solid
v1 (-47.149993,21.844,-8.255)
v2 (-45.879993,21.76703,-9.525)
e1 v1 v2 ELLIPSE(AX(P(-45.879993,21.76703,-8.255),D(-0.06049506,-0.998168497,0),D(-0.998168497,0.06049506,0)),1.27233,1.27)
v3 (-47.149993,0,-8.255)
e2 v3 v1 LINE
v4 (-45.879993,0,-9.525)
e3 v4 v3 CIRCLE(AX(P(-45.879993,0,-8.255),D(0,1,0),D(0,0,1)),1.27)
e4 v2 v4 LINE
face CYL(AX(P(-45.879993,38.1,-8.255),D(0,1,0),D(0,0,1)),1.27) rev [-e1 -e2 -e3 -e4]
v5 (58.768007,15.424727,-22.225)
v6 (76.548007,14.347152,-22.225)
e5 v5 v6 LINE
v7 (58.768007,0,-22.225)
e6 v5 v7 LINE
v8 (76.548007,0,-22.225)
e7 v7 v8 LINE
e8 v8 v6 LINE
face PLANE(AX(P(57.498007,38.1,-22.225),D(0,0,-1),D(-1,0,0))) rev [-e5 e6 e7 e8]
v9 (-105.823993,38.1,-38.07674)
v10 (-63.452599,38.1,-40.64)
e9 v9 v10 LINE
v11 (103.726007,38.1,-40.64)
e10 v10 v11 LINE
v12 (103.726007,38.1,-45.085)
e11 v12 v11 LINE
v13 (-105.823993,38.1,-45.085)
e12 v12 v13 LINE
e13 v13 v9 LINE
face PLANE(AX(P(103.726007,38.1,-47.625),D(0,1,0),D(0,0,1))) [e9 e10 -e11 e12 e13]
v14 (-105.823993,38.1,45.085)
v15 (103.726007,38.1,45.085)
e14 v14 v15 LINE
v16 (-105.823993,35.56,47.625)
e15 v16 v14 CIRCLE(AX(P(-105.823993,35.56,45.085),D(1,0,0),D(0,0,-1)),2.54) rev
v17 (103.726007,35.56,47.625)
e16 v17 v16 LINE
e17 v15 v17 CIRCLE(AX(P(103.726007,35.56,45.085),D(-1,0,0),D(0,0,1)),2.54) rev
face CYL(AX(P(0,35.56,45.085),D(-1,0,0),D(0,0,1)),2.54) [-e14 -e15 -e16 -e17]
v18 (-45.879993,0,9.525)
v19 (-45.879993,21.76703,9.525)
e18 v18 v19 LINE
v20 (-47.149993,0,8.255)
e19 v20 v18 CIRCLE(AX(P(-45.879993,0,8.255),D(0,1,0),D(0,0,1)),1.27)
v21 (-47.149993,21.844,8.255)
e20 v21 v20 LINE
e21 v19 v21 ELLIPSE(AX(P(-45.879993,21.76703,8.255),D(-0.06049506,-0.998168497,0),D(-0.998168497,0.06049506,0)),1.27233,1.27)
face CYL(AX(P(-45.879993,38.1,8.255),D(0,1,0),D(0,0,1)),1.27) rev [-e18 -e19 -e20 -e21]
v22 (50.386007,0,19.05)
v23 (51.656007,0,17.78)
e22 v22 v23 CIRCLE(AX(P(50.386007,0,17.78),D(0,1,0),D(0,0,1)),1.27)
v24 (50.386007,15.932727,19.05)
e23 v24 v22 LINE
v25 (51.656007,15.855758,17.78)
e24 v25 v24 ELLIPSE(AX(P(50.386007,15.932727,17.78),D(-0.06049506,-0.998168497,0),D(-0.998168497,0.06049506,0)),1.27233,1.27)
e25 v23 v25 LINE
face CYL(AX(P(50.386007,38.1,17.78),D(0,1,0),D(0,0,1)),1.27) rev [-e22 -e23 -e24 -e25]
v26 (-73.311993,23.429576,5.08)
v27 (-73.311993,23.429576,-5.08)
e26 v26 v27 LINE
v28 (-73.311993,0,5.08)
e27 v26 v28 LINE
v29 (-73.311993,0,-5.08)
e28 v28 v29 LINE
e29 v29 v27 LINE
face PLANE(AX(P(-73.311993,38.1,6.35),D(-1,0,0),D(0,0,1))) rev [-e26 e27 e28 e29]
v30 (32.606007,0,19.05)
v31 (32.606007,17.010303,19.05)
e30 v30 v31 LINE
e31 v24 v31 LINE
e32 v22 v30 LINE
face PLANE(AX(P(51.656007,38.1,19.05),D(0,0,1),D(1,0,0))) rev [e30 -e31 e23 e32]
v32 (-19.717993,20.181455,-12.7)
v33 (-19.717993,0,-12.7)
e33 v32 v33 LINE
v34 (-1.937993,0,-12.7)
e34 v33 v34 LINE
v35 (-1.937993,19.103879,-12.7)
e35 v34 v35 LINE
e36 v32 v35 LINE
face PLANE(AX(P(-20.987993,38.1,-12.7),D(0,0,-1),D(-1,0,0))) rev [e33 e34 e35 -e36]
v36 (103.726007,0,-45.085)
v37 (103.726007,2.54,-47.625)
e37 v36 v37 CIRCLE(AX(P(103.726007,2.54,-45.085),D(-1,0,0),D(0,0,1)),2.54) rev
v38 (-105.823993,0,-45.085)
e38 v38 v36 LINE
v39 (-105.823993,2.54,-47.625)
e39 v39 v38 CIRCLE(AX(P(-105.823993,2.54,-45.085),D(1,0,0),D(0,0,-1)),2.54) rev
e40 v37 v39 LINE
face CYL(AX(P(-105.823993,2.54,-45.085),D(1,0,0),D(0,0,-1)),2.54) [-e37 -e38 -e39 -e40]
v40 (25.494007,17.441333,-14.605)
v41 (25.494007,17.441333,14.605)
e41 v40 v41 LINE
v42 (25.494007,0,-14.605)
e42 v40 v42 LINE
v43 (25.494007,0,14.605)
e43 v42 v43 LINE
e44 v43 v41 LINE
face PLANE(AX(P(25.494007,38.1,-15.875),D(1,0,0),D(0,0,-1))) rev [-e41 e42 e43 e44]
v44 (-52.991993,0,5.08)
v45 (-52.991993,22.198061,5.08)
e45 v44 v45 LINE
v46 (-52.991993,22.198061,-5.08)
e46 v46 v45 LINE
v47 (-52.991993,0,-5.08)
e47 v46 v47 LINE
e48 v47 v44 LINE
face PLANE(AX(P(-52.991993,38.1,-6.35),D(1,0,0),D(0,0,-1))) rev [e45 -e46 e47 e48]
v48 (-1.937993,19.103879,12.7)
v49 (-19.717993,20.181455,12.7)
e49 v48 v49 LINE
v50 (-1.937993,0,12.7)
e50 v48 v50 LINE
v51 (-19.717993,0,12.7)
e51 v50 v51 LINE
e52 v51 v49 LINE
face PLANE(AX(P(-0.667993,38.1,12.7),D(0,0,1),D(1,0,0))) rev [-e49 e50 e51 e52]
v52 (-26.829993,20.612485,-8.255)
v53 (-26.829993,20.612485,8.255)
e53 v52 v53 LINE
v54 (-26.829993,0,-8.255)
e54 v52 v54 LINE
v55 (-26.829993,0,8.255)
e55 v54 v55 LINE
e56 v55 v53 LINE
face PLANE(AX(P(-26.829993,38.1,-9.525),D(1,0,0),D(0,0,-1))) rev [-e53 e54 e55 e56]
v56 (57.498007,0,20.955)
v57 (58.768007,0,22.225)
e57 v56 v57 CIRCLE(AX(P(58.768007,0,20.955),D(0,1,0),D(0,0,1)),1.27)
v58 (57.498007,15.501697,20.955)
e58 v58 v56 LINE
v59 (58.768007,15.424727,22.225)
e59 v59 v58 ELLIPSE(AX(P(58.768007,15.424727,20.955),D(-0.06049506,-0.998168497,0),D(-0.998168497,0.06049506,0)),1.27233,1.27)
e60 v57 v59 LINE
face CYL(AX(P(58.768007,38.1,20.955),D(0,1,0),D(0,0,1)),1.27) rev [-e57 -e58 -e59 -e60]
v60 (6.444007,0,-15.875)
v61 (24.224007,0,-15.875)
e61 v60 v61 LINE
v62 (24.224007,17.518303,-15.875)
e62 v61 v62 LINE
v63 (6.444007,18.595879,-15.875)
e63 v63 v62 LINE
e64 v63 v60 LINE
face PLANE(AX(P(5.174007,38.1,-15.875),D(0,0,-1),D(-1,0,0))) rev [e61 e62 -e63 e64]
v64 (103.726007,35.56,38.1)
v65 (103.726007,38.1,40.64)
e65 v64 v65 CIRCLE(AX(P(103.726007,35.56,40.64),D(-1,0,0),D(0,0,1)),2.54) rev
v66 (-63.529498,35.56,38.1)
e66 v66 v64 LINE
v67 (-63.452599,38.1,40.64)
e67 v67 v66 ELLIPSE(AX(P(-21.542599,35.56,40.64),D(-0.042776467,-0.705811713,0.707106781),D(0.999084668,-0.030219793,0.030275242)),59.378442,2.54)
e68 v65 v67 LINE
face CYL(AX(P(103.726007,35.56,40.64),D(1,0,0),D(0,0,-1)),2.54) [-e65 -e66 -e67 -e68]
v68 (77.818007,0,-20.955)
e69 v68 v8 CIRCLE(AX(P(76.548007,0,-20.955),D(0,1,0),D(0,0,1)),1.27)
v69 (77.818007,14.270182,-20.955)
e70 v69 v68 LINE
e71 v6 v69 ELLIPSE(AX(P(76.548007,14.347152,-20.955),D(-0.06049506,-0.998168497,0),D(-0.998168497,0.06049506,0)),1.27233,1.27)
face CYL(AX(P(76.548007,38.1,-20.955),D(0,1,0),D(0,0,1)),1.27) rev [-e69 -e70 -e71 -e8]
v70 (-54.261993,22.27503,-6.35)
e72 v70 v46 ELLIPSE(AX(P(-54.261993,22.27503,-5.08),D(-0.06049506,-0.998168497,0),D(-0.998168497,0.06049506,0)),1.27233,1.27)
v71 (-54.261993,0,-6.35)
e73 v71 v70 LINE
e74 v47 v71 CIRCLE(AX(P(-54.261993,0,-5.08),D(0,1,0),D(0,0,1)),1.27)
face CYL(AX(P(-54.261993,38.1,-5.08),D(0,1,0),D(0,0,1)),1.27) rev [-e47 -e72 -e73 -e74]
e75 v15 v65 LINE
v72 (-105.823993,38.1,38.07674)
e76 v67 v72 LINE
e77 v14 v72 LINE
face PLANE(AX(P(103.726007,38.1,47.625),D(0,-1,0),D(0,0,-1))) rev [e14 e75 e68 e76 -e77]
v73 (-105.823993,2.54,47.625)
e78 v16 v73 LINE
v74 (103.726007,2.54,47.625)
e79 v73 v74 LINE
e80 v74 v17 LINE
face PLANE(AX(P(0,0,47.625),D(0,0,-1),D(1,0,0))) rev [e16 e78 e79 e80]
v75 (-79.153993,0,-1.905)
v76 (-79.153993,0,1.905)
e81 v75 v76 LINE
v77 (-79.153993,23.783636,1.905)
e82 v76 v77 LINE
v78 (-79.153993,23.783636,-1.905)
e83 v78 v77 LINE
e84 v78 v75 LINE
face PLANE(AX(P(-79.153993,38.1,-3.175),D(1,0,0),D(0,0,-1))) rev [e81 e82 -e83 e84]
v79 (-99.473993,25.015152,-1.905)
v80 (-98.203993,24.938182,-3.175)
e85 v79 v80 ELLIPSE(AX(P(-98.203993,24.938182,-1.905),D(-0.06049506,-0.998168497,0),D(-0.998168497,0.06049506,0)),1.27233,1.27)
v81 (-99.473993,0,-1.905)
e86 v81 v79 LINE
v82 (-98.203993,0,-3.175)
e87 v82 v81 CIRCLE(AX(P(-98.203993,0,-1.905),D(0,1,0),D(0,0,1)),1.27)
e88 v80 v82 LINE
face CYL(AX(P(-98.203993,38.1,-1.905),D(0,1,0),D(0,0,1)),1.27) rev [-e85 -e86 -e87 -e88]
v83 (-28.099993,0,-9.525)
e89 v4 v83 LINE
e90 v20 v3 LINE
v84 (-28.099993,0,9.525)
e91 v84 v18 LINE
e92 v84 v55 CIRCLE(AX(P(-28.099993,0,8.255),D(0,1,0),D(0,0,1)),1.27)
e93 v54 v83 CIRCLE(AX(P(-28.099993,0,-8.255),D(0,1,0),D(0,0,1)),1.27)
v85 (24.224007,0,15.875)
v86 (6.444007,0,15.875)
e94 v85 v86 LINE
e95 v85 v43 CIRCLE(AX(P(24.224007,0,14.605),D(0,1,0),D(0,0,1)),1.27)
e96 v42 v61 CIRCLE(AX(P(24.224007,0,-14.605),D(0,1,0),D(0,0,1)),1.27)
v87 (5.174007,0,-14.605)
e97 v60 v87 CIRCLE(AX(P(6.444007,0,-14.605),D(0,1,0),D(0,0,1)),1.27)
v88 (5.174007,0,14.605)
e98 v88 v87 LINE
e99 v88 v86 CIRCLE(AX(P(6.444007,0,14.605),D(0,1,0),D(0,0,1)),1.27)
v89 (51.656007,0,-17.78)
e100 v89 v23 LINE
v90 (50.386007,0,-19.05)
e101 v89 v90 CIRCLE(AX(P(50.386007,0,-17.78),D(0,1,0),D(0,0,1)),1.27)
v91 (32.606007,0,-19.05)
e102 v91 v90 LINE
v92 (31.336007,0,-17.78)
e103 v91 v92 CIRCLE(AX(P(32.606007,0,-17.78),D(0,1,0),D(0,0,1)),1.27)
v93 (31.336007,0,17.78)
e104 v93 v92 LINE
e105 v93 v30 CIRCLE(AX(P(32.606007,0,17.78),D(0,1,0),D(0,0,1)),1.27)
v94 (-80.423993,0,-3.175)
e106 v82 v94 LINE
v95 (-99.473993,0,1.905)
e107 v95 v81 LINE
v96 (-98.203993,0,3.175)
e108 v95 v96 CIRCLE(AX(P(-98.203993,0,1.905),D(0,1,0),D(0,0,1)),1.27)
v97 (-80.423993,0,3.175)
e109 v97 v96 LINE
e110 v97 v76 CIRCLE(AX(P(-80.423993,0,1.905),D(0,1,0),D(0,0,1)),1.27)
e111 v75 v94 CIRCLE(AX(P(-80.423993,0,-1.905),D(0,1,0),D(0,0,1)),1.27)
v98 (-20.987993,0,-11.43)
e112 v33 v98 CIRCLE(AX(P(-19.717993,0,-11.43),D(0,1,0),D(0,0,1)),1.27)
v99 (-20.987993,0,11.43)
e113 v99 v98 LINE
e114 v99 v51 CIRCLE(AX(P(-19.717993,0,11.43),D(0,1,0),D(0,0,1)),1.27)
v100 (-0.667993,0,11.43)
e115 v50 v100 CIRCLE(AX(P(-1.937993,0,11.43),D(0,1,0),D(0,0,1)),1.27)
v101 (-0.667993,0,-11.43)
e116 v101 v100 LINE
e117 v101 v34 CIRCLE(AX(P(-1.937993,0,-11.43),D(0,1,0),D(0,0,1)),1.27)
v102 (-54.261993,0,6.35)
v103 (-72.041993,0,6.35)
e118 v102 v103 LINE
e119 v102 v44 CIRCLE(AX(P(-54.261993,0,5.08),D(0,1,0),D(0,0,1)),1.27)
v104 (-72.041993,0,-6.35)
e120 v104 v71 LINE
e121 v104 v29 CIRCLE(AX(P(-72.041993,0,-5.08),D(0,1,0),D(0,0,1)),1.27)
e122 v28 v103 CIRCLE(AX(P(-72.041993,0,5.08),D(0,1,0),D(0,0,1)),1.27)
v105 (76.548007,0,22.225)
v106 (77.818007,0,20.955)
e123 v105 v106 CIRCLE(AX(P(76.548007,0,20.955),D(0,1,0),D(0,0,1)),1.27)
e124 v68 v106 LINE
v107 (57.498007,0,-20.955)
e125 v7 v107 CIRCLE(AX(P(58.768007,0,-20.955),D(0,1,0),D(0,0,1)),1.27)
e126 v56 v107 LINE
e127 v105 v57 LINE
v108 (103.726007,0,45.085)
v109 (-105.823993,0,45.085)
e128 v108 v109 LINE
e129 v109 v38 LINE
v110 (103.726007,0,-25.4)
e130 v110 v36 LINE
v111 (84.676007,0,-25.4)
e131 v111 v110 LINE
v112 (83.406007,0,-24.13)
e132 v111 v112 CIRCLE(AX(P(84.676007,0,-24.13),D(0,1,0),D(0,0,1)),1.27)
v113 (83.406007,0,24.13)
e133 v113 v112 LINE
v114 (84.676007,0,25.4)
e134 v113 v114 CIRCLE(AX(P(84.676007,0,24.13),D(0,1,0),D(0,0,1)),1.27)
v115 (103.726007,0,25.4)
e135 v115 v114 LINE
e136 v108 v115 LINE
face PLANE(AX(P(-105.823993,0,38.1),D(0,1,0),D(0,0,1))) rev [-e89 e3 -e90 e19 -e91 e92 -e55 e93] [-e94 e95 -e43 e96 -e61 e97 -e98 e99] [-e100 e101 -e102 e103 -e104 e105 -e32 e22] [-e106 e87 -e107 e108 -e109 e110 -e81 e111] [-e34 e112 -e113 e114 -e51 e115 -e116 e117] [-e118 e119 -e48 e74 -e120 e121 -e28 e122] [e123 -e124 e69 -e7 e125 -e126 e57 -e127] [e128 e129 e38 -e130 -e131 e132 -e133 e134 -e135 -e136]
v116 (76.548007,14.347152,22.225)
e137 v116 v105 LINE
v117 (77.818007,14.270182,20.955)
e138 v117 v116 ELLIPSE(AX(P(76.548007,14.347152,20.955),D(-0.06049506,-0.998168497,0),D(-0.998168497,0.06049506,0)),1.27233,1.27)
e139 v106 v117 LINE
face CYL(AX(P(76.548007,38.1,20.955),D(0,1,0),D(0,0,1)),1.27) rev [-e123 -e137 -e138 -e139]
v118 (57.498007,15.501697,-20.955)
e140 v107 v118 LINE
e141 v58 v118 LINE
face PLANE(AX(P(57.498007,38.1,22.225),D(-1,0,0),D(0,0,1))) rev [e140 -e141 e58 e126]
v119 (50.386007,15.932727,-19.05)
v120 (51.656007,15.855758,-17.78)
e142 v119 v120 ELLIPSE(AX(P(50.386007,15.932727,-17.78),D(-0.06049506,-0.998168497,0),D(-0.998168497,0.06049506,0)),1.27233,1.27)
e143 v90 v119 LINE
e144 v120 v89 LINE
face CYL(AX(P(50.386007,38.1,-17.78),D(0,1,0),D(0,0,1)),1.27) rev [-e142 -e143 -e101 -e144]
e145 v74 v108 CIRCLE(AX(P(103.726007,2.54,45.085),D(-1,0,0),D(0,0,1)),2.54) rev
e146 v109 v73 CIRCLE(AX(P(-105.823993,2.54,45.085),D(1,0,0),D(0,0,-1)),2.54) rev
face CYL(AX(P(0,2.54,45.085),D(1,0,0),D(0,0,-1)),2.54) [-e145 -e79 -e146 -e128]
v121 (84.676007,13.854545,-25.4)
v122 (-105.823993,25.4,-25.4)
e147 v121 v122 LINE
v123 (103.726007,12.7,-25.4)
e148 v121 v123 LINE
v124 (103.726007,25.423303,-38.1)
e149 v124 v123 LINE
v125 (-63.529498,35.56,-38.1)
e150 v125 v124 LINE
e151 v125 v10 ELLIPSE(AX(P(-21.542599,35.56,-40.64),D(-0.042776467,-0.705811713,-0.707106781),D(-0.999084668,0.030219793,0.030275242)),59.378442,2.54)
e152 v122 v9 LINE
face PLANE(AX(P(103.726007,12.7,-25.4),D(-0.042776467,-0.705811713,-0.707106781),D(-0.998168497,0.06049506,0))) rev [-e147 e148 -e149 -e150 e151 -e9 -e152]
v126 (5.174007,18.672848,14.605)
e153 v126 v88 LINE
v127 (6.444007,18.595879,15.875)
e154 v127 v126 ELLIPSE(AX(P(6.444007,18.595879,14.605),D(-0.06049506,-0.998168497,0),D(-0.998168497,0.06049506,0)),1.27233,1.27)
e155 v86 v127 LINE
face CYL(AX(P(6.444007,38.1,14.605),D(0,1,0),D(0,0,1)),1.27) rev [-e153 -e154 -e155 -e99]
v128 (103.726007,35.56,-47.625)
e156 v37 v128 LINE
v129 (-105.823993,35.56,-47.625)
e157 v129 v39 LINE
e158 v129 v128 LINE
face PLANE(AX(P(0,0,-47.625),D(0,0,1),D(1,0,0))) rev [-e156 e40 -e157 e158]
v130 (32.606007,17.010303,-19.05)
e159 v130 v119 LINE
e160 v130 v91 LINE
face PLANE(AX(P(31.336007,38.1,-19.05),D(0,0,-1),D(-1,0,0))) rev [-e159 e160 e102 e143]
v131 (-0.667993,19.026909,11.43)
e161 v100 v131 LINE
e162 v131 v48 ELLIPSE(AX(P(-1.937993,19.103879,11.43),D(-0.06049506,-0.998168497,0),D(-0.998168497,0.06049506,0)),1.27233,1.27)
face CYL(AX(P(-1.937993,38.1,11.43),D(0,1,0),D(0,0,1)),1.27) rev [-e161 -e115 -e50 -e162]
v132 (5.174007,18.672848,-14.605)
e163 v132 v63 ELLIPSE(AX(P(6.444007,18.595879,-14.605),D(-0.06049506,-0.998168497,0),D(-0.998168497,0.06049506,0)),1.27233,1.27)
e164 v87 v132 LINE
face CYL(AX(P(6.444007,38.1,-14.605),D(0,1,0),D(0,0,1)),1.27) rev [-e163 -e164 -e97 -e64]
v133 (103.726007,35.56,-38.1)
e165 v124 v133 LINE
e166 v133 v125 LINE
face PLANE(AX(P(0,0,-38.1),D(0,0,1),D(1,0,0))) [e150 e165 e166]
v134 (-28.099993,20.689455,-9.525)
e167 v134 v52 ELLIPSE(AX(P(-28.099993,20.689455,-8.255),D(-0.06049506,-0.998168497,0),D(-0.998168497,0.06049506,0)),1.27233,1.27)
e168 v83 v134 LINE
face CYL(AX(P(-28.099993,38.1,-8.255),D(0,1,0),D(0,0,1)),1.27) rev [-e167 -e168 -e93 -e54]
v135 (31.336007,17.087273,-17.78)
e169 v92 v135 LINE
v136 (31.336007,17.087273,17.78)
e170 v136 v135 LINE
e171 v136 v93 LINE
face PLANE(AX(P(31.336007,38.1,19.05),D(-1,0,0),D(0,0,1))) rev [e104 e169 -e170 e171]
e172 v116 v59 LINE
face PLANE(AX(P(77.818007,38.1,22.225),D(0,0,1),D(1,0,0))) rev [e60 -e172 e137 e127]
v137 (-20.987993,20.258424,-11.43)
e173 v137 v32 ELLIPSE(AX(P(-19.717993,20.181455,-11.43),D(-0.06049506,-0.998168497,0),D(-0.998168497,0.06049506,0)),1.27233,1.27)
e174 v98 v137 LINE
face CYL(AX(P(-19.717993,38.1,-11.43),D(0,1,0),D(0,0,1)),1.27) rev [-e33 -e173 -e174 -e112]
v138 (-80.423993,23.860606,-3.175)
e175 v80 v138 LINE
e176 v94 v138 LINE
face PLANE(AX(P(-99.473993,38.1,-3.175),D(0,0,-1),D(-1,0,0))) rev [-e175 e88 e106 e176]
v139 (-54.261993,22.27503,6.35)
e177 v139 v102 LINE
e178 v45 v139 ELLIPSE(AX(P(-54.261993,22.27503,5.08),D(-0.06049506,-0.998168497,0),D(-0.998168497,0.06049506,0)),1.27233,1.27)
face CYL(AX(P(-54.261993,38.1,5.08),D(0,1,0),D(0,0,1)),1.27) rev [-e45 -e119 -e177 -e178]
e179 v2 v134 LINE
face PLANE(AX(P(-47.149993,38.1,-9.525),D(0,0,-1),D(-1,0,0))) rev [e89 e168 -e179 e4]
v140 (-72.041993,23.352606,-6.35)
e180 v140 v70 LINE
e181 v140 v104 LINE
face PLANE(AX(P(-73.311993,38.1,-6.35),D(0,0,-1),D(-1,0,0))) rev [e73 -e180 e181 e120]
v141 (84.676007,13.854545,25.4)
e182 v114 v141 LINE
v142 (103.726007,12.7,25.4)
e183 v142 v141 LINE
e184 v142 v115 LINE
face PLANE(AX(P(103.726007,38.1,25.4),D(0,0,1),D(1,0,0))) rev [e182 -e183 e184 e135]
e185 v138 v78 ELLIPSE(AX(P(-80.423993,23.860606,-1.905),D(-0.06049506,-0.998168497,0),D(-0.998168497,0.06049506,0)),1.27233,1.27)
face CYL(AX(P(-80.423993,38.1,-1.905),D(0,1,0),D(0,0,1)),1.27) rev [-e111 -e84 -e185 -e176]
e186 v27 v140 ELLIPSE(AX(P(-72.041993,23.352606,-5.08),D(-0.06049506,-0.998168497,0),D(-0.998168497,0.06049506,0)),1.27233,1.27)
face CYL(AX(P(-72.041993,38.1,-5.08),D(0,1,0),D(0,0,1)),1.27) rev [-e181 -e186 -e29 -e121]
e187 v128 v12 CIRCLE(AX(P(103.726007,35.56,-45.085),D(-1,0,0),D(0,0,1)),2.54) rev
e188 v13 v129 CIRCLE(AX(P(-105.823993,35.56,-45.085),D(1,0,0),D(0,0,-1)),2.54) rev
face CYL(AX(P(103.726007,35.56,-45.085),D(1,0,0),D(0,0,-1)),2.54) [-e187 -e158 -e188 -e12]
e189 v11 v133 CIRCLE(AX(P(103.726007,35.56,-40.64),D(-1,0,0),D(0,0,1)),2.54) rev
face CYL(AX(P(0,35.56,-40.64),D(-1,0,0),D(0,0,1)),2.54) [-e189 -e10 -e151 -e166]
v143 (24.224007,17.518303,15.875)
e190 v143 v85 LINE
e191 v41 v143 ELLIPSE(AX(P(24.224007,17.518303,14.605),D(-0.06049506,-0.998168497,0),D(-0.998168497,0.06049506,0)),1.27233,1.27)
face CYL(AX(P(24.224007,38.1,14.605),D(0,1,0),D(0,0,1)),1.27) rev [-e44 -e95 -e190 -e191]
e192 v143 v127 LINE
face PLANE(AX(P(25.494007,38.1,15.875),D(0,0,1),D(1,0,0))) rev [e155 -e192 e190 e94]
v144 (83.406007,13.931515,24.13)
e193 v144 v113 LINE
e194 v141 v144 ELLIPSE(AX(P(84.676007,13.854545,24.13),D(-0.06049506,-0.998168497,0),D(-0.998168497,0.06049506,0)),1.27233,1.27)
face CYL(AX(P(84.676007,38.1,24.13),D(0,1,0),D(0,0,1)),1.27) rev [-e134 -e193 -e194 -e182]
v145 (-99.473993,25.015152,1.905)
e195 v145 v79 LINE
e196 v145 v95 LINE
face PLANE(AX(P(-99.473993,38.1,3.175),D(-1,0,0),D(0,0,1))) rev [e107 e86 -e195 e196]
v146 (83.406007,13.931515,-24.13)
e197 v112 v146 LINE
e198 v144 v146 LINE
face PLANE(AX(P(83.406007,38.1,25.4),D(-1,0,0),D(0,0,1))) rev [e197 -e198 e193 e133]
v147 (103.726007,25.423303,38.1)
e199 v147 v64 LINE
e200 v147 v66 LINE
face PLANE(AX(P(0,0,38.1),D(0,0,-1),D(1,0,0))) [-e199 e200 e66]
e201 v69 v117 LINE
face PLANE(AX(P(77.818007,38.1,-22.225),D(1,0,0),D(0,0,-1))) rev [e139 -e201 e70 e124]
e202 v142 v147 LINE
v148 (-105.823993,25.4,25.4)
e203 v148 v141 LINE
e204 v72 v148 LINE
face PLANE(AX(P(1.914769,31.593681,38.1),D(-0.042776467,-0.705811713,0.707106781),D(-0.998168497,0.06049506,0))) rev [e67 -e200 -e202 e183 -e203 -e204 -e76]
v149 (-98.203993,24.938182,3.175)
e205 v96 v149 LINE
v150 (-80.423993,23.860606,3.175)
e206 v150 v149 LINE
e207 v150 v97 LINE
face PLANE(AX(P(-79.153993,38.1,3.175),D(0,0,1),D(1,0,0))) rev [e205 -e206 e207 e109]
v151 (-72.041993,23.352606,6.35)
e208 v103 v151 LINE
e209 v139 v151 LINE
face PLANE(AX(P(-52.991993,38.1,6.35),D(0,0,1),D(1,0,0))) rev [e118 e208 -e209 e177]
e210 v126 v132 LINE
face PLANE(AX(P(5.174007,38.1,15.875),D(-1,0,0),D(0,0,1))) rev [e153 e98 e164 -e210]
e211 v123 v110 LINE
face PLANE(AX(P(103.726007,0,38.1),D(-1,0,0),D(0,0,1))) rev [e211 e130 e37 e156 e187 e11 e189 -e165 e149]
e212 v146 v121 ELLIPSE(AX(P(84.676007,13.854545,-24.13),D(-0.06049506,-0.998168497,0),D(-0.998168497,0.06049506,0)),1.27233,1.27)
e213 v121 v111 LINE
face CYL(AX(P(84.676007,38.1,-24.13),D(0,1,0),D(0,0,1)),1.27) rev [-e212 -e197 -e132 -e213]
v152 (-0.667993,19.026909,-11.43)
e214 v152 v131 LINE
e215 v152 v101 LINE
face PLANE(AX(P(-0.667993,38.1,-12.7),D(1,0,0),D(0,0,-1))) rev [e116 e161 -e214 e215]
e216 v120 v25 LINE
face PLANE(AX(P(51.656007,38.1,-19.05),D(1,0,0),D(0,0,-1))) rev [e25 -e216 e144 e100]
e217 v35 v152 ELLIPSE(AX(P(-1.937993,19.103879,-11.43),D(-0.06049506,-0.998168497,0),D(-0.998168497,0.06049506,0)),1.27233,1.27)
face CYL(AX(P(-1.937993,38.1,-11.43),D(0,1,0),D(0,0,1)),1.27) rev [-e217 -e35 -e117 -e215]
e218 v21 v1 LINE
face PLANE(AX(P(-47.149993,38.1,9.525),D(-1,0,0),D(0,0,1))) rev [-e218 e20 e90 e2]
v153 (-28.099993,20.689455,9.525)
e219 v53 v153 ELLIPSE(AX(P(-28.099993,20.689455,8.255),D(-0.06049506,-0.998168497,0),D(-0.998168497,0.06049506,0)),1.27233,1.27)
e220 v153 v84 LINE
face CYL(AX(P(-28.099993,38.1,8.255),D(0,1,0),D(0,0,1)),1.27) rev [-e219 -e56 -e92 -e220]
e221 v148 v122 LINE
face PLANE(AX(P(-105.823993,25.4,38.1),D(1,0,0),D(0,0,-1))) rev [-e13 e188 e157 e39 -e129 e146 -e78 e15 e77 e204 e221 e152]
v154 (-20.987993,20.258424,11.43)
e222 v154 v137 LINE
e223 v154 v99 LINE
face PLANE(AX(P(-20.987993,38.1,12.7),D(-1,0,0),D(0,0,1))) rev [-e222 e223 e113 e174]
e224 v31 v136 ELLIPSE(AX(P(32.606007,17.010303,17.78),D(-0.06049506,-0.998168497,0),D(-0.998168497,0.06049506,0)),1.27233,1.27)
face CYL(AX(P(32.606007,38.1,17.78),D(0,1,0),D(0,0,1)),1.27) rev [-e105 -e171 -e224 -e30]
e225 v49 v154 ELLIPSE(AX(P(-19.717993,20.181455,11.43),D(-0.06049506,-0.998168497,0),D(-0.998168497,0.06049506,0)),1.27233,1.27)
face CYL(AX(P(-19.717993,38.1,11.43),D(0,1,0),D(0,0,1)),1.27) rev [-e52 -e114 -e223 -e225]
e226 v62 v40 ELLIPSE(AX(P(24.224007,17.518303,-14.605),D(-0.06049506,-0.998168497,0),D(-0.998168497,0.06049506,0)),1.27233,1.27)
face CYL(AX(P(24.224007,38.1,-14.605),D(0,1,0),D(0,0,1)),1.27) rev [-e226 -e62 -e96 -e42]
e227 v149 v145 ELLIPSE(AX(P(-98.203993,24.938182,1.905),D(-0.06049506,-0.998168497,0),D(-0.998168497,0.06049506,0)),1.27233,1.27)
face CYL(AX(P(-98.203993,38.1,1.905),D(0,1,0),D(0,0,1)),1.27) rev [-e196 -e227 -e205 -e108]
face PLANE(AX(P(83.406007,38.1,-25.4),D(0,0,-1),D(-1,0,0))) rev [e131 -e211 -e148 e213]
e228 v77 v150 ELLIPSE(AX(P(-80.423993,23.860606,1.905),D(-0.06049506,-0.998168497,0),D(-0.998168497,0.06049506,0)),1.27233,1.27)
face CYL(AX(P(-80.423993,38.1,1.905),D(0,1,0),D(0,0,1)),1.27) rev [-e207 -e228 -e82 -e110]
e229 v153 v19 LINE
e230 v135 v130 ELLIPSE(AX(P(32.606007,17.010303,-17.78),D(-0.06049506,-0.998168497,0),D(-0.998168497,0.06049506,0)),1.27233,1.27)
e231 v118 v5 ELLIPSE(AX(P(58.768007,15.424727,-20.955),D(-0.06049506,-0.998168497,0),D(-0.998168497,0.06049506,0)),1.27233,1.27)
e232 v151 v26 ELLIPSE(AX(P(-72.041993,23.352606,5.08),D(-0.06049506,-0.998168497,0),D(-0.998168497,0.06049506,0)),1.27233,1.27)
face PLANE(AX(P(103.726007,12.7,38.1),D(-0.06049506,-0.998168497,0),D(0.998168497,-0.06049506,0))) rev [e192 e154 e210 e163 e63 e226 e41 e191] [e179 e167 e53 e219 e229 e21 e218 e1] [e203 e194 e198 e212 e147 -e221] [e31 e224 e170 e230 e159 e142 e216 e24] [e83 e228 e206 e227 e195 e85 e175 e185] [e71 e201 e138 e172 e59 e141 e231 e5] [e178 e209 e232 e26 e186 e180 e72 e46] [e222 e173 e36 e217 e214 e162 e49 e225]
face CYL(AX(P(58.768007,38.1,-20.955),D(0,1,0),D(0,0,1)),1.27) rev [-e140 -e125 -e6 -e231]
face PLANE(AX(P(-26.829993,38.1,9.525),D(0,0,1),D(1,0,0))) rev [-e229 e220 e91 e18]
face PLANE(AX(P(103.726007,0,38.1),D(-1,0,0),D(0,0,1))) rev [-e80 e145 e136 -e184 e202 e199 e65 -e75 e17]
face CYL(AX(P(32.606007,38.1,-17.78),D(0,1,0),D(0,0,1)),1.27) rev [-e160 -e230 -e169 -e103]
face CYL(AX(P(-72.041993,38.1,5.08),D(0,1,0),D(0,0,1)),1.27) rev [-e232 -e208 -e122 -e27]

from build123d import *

# Parameters (mm, degrees)
BOSS_EXTRUDE1_DEPTH = 38.1
SKETCH2_W           = 209.55
SKETCH2_H           = 38.1
BOSS_EXTRUDE2_DEPTH = 9.525
SKETCH3_W           = 20.32
SKETCH3_H           = 6.35
SKETCH3_H_2         = 12.7
SKETCH3_H_3         = 19.05
SKETCH3_H_4         = 25.4
SKETCH3_H_5         = 31.75
SKETCH3_H_6         = 38.1
SKETCH3_H_7         = 44.45
SKETCH3_H_8         = 50.8
CUT_EXTRUDE1_DEPTH  = 123.141181515
FILLET1_R           = 1.27
CHAMFER1_SIZE       = 12.7
FILLET2_R           = 2.54


with BuildPart() as part:
    # Sketch1 → Boss-Extrude1 (new, symmetric)
    with BuildSketch(Plane.XY):
        Polygon((-105.823993484, 0), (103.726006516, 0), (103.726006516, 12.7), (-105.823993484, 25.4), align=None)
    extrude(amount=BOSS_EXTRUDE1_DEPTH, both=True)

    # Sketch2 → Boss-Extrude2 (add)
    with BuildSketch(Plane(origin=(0, 0, -38.1), x_dir=(-1, 0, 0), z_dir=(0, 0, -1))):
        with Locations((1.048993484, 19.05)):
            Rectangle(SKETCH2_W, SKETCH2_H)
    boss_extrude2 = extrude(amount=BOSS_EXTRUDE2_DEPTH)

    # Mirror1: Boss-Extrude2 across plane
    add(boss_extrude2.mirror(Plane.XY))

    # Sketch3 → Cut-Extrude1 (cut, through all)
    with BuildSketch(Plane.XZ):
        with Locations((-89.313993484, 0)):
            Rectangle(SKETCH3_W, SKETCH3_H)
        with Locations((-63.151993484, 0)):
            Rectangle(SKETCH3_W, SKETCH3_H_2)
        with Locations((-36.989993484, 0)):
            Rectangle(SKETCH3_W, SKETCH3_H_3)
        with Locations((-10.827993484, 0)):
            Rectangle(SKETCH3_W, SKETCH3_H_4)
        with Locations((15.334006516, 0)):
            Rectangle(SKETCH3_W, SKETCH3_H_5)
        with Locations((41.496006516, 0)):
            Rectangle(SKETCH3_W, SKETCH3_H_6)
        with Locations((67.658006516, 0)):
            Rectangle(SKETCH3_W, SKETCH3_H_7)
        with Locations((93.566006516, 0)):
            Rectangle(SKETCH3_W, SKETCH3_H_8)
    extrude(amount=-CUT_EXTRUDE1_DEPTH, mode=Mode.SUBTRACT)

    # Fillet1
    fillet1_edges = [part.edges().sort_by_distance(p)[0] for p in [
        (-20.987993484, 10.129212121, -12.7),
        (-20.987993484, 10.129212121, 12.7),
        (-0.667993484, 9.513454545, 12.7),
        (-0.667993484, 9.513454545, -12.7),
        (5.174006516, 9.336424242, -15.875),
        (5.174006516, 9.336424242, 15.875),
        (25.494006516, 8.720666667, 15.875),
        (25.494006516, 8.720666667, -15.875),
        (31.336006516, 8.543636364, -19.05),
        (31.336006516, 8.543636364, 19.05),
        (51.656006516, 7.927878788, 19.05),
        (51.656006516, 7.927878788, -19.05),
        (57.498006516, 7.750848485, -22.225),
        (57.498006516, 7.750848485, 22.225),
        (77.818006516, 7.135090909, 22.225),
        (77.818006516, 7.135090909, -22.225),
        (83.406006516, 6.965757576, -25.4),
        (83.406006516, 6.965757576, 25.4),
        (-99.473993484, 12.507575758, 3.175),
        (-79.153993484, 11.891818182, 3.175),
        (-79.153993484, 11.891818182, -3.175),
        (-99.473993484, 12.507575758, -3.175),
        (-73.311993484, 11.714787879, -6.35),
        (-73.311993484, 11.714787879, 6.35),
        (-52.991993484, 11.099030303, 6.35),
        (-52.991993484, 11.099030303, -6.35),
        (-47.149993484, 10.922, -9.525),
        (-47.149993484, 10.922, 9.525),
        (-26.829993484, 10.306242424, 9.525),
        (-26.829993484, 10.306242424, -9.525),
    ]]
    fillet(fillet1_edges, radius=FILLET1_R)

    # Chamfer1
    chamfer1_edges = [part.edges().sort_by_distance(p)[0] for p in [
        (-1.048993484, 19.05, 38.1),
        (-1.048993484, 19.05, -38.1),
    ]]
    chamfer(chamfer1_edges, length=CHAMFER1_SIZE - 0.0001)  # a hair under: the kernel refuses the full size

    # Fillet2
    fillet2_edges = [part.edges().sort_by_distance(p)[0] for p in [
        (-0.85757213, 38.1, -38.1),
        (-1.048993484, 0, -47.625),
        (-1.048993484, 38.1, -47.625),
        (-0.85757213, 38.1, 38.1),
        (-1.048993484, 38.1, 47.625),
        (-1.048993484, 0, 47.625),
    ]]
    fillet(fillet2_edges, radius=FILLET2_R)


solid = part.part
